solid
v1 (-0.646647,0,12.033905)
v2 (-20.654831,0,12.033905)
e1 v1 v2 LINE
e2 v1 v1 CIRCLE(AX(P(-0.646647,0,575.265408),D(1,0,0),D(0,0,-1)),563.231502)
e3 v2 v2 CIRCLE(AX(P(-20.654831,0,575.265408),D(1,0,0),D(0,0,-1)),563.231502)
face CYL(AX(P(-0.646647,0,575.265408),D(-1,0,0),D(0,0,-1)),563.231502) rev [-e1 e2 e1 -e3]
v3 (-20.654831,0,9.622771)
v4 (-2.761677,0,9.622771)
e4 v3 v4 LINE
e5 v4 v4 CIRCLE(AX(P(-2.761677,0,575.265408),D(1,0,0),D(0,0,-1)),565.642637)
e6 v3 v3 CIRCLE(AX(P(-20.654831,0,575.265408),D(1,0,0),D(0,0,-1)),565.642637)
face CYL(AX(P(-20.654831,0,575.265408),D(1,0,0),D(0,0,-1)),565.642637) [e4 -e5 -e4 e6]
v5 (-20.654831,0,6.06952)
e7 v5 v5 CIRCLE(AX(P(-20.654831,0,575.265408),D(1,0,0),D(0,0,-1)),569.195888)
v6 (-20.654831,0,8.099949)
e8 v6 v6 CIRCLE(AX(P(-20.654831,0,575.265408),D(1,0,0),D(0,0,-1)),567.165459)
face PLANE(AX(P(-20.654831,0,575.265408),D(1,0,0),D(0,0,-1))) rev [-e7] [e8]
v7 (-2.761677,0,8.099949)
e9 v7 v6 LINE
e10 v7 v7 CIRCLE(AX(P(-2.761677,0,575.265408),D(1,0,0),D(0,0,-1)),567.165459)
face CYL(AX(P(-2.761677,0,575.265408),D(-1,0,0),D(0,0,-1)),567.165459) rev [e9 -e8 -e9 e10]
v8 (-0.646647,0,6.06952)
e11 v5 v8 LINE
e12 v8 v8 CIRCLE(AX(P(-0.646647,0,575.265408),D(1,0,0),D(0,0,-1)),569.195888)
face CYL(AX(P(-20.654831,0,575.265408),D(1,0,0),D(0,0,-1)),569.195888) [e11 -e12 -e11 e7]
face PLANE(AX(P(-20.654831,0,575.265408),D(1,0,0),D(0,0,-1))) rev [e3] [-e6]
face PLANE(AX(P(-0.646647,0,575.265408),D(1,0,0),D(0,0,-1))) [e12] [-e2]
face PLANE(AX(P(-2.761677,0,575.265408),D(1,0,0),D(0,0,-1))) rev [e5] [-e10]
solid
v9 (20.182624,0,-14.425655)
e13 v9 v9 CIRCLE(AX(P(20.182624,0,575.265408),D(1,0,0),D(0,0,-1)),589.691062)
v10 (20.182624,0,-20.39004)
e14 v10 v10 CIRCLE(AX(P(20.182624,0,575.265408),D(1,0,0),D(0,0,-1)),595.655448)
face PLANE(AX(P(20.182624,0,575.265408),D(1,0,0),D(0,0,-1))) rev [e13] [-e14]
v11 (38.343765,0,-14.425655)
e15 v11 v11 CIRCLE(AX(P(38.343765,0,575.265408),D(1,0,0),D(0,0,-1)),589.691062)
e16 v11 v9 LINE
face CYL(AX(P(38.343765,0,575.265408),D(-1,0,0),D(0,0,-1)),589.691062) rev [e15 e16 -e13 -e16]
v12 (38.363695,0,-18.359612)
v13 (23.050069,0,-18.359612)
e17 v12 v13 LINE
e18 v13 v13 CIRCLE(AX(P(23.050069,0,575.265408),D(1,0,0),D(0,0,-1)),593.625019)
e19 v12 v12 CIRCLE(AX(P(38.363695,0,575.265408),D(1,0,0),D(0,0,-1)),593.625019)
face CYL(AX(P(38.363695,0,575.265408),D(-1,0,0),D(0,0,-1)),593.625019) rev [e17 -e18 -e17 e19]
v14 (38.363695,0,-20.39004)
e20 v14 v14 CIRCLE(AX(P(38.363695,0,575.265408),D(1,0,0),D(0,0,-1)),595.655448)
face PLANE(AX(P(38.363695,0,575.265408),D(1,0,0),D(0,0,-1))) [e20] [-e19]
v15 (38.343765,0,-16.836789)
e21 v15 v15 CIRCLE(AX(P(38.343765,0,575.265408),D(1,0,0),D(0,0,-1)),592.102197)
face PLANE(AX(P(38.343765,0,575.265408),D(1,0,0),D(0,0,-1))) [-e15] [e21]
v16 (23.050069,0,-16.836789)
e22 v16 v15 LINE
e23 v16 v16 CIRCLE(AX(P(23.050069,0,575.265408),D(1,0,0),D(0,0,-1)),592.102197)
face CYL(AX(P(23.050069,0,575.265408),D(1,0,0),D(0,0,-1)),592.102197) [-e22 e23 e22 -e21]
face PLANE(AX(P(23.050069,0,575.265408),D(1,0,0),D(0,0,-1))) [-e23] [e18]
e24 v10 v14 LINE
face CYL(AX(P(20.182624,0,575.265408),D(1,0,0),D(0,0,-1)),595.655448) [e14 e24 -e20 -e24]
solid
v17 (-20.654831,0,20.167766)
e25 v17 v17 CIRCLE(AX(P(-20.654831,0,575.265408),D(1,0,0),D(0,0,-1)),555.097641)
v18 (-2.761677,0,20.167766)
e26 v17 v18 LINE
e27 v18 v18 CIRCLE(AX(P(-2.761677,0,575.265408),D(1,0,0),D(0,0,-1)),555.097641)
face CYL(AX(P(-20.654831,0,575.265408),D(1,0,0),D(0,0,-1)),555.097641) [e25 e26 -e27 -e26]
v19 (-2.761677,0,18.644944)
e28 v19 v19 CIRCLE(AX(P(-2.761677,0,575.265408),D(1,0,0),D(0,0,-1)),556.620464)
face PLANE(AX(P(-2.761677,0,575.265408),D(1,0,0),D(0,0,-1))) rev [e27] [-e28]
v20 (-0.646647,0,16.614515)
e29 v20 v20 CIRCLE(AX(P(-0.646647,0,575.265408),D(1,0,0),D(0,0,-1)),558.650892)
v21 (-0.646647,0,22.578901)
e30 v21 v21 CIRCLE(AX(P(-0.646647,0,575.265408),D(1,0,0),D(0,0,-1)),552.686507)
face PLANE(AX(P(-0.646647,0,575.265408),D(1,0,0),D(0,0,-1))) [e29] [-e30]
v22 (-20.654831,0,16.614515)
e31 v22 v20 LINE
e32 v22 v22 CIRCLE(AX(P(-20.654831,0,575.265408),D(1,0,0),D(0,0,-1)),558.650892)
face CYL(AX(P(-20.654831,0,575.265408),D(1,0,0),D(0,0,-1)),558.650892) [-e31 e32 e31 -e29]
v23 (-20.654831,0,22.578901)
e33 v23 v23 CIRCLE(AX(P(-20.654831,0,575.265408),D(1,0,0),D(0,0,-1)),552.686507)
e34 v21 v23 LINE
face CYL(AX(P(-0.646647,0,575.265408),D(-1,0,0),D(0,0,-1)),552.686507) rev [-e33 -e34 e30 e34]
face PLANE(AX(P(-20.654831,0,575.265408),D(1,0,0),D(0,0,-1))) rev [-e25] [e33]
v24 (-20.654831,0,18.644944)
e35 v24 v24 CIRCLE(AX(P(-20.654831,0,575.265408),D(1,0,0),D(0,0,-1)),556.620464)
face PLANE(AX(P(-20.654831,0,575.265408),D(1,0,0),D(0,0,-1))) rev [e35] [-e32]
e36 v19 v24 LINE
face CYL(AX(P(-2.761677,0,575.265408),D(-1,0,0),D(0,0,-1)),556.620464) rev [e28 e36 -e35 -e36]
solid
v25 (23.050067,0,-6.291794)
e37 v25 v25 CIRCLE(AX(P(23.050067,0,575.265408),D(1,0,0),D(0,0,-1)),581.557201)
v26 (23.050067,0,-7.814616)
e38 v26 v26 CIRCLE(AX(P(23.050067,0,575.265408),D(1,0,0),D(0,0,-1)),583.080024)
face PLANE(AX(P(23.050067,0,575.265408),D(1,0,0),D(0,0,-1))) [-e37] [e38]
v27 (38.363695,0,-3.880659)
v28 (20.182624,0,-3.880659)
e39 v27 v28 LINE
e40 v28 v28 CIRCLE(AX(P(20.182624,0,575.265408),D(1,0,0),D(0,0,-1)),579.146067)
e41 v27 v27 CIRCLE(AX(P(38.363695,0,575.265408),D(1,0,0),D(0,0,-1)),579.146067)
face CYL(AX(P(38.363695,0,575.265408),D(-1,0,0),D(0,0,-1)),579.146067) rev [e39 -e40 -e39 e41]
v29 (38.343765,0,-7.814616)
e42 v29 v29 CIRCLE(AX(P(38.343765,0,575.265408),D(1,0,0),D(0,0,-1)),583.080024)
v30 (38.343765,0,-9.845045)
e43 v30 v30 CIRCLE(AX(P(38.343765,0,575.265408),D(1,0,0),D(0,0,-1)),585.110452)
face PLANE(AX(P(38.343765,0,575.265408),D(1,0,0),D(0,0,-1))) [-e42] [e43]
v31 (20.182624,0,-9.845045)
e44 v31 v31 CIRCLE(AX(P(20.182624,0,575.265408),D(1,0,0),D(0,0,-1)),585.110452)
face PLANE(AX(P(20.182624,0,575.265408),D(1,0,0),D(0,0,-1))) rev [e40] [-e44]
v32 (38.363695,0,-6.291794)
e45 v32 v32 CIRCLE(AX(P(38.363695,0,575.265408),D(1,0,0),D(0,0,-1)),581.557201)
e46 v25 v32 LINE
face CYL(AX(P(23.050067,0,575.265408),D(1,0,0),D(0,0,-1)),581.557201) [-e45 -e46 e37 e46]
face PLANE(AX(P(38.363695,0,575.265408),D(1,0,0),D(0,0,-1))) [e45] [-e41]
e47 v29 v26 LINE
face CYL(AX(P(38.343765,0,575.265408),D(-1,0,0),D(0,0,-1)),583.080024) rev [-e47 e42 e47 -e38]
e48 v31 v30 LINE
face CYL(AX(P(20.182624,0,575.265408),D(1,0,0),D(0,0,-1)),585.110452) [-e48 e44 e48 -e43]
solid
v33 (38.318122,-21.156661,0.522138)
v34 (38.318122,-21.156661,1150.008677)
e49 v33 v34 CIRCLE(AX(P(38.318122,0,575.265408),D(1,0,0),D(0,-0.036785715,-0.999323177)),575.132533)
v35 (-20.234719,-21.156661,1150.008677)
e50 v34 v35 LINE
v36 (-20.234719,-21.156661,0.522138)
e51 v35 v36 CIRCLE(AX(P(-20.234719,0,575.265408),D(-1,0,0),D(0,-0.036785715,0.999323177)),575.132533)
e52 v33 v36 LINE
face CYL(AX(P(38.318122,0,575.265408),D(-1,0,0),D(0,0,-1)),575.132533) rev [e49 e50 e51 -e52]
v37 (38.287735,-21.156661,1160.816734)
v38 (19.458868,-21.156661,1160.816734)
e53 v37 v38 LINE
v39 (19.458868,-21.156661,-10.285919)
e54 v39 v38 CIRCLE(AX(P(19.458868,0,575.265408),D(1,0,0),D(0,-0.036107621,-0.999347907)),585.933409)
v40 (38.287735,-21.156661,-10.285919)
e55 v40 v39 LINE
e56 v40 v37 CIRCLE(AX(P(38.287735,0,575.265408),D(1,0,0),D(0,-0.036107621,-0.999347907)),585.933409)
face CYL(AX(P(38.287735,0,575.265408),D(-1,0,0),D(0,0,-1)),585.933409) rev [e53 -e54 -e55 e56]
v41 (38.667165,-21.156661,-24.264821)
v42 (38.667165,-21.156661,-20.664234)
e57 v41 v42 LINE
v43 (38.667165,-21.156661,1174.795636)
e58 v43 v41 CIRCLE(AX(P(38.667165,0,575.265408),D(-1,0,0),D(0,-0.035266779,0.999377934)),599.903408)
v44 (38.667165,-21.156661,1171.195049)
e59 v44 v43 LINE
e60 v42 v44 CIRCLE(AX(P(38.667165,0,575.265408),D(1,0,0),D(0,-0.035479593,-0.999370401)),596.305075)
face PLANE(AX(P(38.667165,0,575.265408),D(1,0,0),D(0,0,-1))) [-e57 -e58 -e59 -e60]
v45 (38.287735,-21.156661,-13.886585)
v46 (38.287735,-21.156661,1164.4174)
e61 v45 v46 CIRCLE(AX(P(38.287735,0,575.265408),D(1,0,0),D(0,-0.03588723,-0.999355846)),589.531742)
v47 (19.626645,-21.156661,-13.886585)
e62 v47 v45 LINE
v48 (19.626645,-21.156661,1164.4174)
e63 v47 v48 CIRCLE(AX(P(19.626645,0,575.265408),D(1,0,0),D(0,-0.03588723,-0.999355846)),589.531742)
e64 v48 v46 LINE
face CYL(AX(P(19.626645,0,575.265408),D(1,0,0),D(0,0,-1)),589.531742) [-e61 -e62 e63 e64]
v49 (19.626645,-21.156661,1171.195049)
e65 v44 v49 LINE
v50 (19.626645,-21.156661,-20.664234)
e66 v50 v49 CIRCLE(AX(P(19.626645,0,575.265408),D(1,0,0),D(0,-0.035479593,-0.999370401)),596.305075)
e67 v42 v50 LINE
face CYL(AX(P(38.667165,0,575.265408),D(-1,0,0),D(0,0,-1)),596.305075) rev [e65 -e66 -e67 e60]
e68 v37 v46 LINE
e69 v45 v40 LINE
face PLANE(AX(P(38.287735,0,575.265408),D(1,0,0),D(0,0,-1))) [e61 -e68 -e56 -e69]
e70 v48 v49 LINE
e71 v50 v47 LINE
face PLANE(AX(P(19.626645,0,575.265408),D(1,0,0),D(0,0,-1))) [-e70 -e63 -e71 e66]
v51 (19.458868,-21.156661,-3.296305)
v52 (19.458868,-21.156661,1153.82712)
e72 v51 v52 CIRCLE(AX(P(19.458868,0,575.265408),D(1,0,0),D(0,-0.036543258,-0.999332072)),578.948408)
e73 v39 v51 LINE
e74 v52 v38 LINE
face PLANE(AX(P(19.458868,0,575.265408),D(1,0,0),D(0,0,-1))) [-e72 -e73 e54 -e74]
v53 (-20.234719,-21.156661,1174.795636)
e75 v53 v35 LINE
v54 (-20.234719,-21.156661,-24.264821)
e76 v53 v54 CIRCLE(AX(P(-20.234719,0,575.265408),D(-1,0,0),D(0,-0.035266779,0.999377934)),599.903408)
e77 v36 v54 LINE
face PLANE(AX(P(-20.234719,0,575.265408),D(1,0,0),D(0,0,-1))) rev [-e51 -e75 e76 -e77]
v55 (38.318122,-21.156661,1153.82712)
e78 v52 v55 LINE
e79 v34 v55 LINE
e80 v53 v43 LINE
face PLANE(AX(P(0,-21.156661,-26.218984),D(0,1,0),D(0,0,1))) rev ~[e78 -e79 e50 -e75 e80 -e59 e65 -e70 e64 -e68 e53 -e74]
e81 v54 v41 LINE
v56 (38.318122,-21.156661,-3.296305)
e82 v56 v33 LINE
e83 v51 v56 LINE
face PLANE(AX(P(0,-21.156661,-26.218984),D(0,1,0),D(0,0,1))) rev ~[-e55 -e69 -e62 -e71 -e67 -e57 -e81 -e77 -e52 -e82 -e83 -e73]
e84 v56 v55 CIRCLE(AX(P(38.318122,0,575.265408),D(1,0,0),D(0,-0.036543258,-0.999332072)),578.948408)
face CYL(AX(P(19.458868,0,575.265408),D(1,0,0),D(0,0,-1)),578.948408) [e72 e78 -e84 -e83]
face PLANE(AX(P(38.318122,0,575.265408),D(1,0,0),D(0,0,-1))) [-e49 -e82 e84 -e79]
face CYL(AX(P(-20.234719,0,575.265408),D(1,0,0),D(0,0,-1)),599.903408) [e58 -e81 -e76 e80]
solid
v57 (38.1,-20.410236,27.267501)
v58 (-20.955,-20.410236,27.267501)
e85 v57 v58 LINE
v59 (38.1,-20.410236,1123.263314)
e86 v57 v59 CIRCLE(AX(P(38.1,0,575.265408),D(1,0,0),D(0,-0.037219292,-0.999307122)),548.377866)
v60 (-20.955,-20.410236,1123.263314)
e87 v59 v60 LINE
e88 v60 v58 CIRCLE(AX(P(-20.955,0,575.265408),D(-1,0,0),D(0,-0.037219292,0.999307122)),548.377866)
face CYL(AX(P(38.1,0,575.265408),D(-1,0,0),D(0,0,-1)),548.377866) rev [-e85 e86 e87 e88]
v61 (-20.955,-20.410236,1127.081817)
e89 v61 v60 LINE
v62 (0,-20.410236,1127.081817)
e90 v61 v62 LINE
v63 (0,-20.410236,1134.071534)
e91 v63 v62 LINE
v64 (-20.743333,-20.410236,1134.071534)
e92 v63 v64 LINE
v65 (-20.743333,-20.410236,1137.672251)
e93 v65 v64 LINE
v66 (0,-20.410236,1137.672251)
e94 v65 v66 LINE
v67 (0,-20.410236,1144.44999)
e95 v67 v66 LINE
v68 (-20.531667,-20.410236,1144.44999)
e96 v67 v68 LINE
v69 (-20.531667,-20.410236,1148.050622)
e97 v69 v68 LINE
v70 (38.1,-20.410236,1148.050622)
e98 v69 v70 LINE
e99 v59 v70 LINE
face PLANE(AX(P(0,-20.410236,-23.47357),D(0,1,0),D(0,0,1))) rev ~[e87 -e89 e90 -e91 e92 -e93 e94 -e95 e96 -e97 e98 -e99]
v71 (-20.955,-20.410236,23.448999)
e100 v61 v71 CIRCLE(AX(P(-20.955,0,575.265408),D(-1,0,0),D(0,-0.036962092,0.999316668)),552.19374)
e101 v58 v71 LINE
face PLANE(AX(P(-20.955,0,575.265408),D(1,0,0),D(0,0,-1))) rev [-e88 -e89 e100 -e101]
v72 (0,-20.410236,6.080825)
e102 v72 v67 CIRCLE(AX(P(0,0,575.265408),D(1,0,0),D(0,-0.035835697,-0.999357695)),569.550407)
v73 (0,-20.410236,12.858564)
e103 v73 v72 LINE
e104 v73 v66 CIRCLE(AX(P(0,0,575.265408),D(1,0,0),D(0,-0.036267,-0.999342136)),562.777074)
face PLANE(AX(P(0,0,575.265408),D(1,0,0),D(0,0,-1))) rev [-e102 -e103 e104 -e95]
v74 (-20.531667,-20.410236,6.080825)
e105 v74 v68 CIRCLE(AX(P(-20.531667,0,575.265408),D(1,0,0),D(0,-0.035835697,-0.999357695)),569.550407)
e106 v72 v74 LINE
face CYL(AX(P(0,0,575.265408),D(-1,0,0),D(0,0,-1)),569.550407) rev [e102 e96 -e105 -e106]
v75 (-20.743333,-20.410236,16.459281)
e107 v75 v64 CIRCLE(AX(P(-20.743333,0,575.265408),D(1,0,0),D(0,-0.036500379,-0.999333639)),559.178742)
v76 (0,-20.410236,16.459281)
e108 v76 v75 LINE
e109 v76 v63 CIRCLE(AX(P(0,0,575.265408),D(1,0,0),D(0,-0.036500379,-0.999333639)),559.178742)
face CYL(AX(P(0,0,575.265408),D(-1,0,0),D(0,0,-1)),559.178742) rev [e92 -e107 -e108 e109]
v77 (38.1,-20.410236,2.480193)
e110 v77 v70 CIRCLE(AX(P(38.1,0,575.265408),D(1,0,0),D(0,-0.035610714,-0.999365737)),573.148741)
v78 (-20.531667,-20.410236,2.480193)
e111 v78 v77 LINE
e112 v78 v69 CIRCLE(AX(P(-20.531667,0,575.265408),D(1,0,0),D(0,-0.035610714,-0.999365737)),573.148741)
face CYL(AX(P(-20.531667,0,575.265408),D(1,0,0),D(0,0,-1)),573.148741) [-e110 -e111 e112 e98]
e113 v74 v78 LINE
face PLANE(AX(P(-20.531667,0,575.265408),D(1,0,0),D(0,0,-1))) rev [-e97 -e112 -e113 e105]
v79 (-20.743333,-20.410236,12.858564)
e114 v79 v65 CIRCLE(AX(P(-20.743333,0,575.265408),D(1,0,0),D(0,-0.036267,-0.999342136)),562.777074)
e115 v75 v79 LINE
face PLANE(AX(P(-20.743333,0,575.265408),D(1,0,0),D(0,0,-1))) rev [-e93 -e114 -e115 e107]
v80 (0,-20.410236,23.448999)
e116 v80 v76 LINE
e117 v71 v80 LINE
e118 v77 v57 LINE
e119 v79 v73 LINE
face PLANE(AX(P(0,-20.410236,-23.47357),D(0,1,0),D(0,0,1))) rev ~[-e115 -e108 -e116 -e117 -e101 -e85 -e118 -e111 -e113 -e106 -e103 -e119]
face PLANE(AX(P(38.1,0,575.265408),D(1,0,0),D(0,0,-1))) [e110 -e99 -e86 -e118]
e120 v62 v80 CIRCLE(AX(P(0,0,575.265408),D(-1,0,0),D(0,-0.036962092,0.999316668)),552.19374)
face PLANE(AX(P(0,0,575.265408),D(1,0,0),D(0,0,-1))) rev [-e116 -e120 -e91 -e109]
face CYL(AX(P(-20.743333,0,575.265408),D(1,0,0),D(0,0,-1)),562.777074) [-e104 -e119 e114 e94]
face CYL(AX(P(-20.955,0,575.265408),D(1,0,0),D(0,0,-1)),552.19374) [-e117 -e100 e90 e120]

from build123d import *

# Parameters (mm, degrees)
F5_W      = 591.8968357146
F5_H      = 1187.1953699738
F6_DEPTH  = 127
F9_W      = 733.9637354016
F9_H      = 1242.4891926348
F10_DEPTH = 76.2


with BuildPart() as f3:
    # F0 (on Front) → F3 (revolve)
    with BuildSketch(Plane.XZ):
        Polygon((38.1000004709, 26.8875419878), (-20.9550000727, 26.8875419878), (-20.9550000727, 23.0716671795), (0, 23.0716671795), (0, 16.0866659135), (-20.7433328032, 16.0866659135), (-20.7433328032, 12.4883335084), (0, 12.4883335084), (0, 5.7150004432), (-20.5316673964, 5.7150004432), (-20.5316673964, 2.1166666411), (38.1000004709, 2.1166666411), align=None)
    revolve(axis=Axis((60.2579116821, 0, 575.2654075623), (1, 0, 0)))

    # F5 (on Right) → F6 (cut, symmetric)
    with BuildSketch(Plane.YZ):
        with Locations((-316.3586538285, 570.1241148636)):
            Rectangle(F5_W, F5_H)
    extrude(amount=F6_DEPTH, both=True, mode=Mode.SUBTRACT)


with BuildPart() as f4:
    # F2 (on Front) → F4 (revolve)
    with BuildSketch(Plane.XZ):
        Polygon((-0.6466466002, 22.5789006799), (-20.6548310816, 22.5789006799), (-20.6548310816, 20.1677661389), (-2.7616769075, 20.1677661389), (-2.7616769075, 18.6449438334), (-20.6548310816, 18.6449438334), (-20.6548310816, 16.6145153344), (-0.6466466002, 16.6145153344), align=None)
    revolve(axis=Axis((60.2579116821, 0, 575.2654075623), (1, 0, 0)))


with BuildPart() as f4b:
    # F2 (on Front) → F4, piece 2 (revolve)
    with BuildSketch(Plane.XZ):
        Polygon((-0.6466466002, 12.0339053683), (-20.6548310816, 12.0339053683), (-20.6548310816, 9.6227708273), (-2.7616769075, 9.6227708273), (-2.7616769075, 8.0999485217), (-20.6548310816, 8.0999485217), (-20.6548310816, 6.0695200227), (-0.6466466002, 6.0695200227), align=None)
    revolve(axis=Axis((60.2579116821, 0, 575.2654075623), (1, 0, 0)))


with BuildPart() as f8:
    # F7 (on Front) → F8 (revolve)
    with BuildSketch(Plane.XZ):
        Polygon((38.3181218058, 0.132874471), (-20.2347189479, 0.132874471), (-20.2347189479, -24.6380008757), (38.6671647429, -24.6380008757), (38.6671647429, -21.0396670736), (19.6266453713, -21.0396670736), (19.6266453713, -14.2663340084), (38.2877346128, -14.2663340084), (38.2877346128, -10.6680016033), (19.4588676095, -10.6680016033), (19.4588676095, -3.6830003373), (38.3181218058, -3.6830003373), align=None)
    revolve(axis=Axis((60.2579116821, 0, 575.2654075623), (1, 0, 0)))

    # F9 (on Right) → F10 (cut, symmetric)
    with BuildSketch(Plane.YZ):
        with Locations((-388.1385289133, 595.0256120414)):
            Rectangle(F9_W, F9_H)
    extrude(amount=F10_DEPTH, both=True, mode=Mode.SUBTRACT)


with BuildPart() as f12:
    # F11 (on Front) → F12 (revolve)
    with BuildSketch(Plane.XZ):
        Polygon((38.3636948536, -3.8806593511), (20.1826238772, -3.8806593511), (20.1826238772, -9.8450446967), (38.3437645651, -9.8450446967), (38.3437645651, -7.8146161977), (23.0500668986, -7.8146161977), (23.0500668986, -6.2917938922), (38.3636948536, -6.2917938922), align=None)
    revolve(axis=Axis((60.2579116821, 0, 575.2654075623), (1, 0, 0)))


with BuildPart() as f12b:
    # F11 (on Front) → F12, piece 2 (revolve)
    with BuildSketch(Plane.XZ):
        Polygon((38.3437645651, -14.4256546628), (20.1826238772, -14.4256546628), (20.1826238772, -20.3900400084), (38.3636948536, -20.3900400084), (38.3636948536, -18.3596115094), (23.0500687612, -18.3596115094), (23.0500687612, -16.8367892038), (38.3437645651, -16.8367892038), align=None)
    revolve(axis=Axis((60.2579116821, 0, 575.2654075623), (1, 0, 0)))


solid = Compound([f3.part, f4.part, f4b.part, f8.part, f12.part, f12b.part])
